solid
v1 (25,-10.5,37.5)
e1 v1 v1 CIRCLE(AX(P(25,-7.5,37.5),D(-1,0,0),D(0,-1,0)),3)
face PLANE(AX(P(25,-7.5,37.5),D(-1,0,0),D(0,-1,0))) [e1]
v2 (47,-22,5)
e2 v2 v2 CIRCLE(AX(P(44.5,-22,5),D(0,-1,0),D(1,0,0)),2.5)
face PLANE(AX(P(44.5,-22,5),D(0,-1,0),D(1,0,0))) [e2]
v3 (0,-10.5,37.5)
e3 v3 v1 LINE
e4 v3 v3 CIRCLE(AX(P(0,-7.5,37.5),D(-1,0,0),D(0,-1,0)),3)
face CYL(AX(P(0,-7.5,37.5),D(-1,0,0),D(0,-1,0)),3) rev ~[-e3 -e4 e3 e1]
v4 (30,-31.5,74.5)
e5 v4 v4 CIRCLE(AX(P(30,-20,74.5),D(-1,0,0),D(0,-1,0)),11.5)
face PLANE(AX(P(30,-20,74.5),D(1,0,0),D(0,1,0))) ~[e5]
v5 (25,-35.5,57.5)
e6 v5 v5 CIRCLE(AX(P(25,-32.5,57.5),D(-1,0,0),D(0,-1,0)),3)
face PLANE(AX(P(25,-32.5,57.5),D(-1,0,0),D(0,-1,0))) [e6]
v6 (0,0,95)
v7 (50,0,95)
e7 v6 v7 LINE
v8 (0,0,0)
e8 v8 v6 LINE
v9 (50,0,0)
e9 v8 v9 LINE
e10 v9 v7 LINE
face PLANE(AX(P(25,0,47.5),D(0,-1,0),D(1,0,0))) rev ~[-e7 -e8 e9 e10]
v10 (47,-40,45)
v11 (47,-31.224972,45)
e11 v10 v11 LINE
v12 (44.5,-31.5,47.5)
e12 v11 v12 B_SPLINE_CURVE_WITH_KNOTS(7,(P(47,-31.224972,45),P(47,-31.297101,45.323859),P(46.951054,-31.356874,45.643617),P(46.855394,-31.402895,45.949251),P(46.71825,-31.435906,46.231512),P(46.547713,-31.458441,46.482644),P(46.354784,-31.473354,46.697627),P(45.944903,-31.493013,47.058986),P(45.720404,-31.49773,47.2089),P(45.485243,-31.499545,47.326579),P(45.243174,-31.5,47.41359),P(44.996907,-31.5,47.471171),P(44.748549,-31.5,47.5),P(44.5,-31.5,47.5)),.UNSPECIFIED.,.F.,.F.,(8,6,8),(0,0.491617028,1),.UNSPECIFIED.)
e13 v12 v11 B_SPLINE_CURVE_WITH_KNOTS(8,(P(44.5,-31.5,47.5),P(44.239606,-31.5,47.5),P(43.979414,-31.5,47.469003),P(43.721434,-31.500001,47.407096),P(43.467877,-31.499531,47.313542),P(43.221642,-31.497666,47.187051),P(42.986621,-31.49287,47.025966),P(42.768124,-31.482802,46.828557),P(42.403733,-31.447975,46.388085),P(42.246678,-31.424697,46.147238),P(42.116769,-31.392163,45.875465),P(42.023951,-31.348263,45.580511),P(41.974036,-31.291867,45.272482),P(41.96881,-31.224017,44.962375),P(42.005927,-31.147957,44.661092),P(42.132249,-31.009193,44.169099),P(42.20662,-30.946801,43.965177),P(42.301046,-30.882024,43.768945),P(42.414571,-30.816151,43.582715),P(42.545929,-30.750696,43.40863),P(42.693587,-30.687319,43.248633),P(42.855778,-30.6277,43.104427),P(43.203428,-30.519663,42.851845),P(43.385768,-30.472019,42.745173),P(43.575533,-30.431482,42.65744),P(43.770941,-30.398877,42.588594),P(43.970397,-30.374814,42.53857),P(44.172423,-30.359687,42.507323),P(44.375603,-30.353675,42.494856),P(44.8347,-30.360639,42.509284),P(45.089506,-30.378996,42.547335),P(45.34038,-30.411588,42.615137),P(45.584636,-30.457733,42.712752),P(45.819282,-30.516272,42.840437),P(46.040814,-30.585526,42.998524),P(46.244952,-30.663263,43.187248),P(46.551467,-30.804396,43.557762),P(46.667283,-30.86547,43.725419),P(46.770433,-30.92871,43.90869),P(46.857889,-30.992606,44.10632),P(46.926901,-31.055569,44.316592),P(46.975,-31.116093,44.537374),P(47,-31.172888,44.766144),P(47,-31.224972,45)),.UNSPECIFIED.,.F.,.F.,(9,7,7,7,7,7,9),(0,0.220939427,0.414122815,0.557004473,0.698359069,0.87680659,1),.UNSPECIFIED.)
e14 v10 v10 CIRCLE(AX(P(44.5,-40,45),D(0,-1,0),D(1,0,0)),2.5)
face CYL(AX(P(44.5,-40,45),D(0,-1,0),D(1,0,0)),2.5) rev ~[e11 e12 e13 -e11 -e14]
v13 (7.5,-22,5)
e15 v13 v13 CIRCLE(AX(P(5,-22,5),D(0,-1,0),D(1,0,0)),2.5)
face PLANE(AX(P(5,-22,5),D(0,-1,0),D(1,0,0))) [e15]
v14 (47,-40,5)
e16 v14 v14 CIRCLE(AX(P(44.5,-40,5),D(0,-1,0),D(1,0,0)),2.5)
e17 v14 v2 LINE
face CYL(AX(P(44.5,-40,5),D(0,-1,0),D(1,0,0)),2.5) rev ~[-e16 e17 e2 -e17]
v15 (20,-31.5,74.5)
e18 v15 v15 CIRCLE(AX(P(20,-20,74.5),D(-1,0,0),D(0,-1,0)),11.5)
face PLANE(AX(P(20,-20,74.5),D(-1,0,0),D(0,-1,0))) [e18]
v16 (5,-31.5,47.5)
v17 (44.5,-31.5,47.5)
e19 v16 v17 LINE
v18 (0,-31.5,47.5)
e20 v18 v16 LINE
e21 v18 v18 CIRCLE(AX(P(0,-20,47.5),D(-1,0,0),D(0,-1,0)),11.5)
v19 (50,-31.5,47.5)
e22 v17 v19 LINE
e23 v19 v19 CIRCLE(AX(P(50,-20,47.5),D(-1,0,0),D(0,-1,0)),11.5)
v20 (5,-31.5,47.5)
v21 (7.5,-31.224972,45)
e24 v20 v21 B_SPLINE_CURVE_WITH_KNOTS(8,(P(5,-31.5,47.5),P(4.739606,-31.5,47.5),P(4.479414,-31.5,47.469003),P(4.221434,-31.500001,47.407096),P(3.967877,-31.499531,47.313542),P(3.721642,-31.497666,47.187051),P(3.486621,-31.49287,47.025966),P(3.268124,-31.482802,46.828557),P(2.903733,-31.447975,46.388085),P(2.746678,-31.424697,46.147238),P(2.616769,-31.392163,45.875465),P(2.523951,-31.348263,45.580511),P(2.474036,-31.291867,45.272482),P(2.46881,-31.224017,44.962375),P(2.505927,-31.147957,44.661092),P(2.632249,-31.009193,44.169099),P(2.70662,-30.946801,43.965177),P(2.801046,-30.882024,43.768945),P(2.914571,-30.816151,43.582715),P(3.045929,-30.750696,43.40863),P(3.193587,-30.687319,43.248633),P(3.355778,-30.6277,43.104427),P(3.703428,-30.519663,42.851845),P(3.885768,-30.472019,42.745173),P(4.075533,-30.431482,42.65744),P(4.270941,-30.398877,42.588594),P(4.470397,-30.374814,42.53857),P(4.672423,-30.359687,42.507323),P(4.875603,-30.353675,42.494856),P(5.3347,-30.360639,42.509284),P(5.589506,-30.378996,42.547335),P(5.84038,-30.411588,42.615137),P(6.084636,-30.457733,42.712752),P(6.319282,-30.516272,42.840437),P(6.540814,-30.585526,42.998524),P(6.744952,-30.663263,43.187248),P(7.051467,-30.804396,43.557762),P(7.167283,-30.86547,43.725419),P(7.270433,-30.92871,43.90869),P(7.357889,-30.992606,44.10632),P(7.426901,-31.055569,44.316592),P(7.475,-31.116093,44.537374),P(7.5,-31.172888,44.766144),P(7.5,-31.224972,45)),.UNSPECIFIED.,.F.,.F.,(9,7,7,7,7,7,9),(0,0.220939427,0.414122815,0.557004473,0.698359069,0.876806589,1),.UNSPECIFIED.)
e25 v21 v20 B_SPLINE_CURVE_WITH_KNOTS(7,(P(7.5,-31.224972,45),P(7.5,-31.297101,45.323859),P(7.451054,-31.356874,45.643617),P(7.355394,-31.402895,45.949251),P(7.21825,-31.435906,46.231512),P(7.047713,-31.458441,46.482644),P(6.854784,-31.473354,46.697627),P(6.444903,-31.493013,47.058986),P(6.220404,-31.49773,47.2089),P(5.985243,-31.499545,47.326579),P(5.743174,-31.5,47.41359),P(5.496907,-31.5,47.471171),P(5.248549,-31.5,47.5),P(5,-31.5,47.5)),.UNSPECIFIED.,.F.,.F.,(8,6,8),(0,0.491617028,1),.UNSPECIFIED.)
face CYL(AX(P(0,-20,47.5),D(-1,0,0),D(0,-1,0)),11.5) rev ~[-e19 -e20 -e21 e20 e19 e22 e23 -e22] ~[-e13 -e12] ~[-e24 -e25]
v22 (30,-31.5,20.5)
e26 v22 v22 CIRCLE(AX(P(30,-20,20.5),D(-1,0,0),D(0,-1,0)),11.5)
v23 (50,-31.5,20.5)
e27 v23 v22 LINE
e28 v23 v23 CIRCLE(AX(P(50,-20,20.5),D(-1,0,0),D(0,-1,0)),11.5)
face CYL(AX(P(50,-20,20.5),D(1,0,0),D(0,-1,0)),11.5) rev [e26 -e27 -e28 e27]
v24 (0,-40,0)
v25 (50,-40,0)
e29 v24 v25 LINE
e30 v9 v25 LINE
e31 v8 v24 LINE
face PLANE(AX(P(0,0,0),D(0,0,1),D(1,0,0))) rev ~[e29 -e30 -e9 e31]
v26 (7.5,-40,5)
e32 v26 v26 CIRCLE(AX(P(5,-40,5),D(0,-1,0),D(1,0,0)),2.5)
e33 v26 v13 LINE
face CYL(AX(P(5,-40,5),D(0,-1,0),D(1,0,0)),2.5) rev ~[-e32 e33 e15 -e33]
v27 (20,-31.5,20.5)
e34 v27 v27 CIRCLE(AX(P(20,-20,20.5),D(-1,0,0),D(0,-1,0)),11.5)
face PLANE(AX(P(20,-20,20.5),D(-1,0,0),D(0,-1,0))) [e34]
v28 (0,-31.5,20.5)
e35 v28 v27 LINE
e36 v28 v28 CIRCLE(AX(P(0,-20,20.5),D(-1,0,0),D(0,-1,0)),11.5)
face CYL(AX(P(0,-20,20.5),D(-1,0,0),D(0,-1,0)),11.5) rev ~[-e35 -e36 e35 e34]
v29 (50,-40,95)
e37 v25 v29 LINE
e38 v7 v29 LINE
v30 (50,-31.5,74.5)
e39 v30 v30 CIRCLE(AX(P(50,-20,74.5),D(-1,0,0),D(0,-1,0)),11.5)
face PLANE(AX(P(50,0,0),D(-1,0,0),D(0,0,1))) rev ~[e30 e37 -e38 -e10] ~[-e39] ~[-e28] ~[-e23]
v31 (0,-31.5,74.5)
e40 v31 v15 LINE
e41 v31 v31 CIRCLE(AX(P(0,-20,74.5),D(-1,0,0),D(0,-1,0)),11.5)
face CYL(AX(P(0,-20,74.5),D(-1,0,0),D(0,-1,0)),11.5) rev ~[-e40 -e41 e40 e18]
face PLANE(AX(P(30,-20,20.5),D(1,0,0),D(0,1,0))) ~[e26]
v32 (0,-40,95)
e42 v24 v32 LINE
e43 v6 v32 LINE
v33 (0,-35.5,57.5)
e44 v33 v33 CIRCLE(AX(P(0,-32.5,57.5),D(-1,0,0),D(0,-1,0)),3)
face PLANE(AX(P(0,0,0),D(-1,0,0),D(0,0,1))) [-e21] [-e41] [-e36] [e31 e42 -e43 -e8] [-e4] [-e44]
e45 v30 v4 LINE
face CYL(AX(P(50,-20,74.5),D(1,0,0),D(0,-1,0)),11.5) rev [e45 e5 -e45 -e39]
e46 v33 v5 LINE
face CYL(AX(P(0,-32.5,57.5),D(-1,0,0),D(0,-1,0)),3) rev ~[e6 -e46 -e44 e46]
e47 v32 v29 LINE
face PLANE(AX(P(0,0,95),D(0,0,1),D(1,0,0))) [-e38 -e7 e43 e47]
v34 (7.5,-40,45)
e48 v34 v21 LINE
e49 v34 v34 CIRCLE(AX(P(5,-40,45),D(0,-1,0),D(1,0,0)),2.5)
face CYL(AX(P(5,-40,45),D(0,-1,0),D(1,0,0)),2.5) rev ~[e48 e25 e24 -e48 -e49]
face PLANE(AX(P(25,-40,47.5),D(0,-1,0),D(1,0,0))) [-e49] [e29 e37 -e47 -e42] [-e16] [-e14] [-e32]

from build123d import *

# Parameters (mm, degrees)
F0_W      = 50
F0_H      = 95
F1_DEPTH  = 40
F2_R      = 2.5
F3_DEPTH  = 18
F4_R      = 11.5
F5_DEPTH  = 20
F7_R      = 11.5
F8_DEPTH  = 50.001
F9_R      = 3
F10_DEPTH = 25


# Not quite as in the source:
# - a pattern or mirror of a feature is missing from the dataset's text; its kind, count and spacing are read off the source's solid


with BuildPart() as f1:
    # F0 (on Front) → F1 (new body)
    with BuildSketch(Plane.XZ):
        with Locations((25, 47.5)):
            Rectangle(F0_W, F0_H)
    extrude(amount=F1_DEPTH)

    # F2 (on face) → F3 (cut)
    with BuildSketch(Plane.XZ.offset(40)):
        with Locations((5, 5)):
            Circle(F2_R)
        with Locations((44.5, 5)):
            Circle(F2_R)
        with Locations((5, 45)):
            Circle(F2_R)
        with Locations((44.5, 45)):
            Circle(F2_R)
    extrude(amount=-F3_DEPTH, mode=Mode.SUBTRACT)

    # F4 (on face) → F5 (cut)
    with BuildSketch(Plane(origin=(0, 0, 0), x_dir=(0, -1, 0), z_dir=(-1, 0, 0))):
        with Locations((20, 74.5)):
            Circle(F4_R)
        with Locations((20, 20.5)):
            Circle(F4_R)
    f5 = extrude(amount=-F5_DEPTH, mode=Mode.SUBTRACT)

    # F5_copies: F5 across plane
    add(f5.mirror(Plane(origin=(25, 0, 0), x_dir=(0, 0, 1), z_dir=(1, 0, 0))), mode=Mode.SUBTRACT)

    # F7 (on face) → F8 (cut, through all)
    with BuildSketch(Plane(origin=(0, 0, 0), x_dir=(0, -1, 0), z_dir=(-1, 0, 0))):
        with Locations((20, 47.5)):
            Circle(F7_R)
    extrude(amount=-F8_DEPTH, mode=Mode.SUBTRACT)

    # F9 (on face) → F10 (cut)
    with BuildSketch(Plane(origin=(0, 0, 0), x_dir=(0, -1, 0), z_dir=(-1, 0, 0))):
        with Locations((32.5, 57.5)):
            Circle(F9_R)
        with Locations((7.5, 37.5)):
            Circle(F9_R)
    extrude(amount=-F10_DEPTH, mode=Mode.SUBTRACT)


solid = f1.part
